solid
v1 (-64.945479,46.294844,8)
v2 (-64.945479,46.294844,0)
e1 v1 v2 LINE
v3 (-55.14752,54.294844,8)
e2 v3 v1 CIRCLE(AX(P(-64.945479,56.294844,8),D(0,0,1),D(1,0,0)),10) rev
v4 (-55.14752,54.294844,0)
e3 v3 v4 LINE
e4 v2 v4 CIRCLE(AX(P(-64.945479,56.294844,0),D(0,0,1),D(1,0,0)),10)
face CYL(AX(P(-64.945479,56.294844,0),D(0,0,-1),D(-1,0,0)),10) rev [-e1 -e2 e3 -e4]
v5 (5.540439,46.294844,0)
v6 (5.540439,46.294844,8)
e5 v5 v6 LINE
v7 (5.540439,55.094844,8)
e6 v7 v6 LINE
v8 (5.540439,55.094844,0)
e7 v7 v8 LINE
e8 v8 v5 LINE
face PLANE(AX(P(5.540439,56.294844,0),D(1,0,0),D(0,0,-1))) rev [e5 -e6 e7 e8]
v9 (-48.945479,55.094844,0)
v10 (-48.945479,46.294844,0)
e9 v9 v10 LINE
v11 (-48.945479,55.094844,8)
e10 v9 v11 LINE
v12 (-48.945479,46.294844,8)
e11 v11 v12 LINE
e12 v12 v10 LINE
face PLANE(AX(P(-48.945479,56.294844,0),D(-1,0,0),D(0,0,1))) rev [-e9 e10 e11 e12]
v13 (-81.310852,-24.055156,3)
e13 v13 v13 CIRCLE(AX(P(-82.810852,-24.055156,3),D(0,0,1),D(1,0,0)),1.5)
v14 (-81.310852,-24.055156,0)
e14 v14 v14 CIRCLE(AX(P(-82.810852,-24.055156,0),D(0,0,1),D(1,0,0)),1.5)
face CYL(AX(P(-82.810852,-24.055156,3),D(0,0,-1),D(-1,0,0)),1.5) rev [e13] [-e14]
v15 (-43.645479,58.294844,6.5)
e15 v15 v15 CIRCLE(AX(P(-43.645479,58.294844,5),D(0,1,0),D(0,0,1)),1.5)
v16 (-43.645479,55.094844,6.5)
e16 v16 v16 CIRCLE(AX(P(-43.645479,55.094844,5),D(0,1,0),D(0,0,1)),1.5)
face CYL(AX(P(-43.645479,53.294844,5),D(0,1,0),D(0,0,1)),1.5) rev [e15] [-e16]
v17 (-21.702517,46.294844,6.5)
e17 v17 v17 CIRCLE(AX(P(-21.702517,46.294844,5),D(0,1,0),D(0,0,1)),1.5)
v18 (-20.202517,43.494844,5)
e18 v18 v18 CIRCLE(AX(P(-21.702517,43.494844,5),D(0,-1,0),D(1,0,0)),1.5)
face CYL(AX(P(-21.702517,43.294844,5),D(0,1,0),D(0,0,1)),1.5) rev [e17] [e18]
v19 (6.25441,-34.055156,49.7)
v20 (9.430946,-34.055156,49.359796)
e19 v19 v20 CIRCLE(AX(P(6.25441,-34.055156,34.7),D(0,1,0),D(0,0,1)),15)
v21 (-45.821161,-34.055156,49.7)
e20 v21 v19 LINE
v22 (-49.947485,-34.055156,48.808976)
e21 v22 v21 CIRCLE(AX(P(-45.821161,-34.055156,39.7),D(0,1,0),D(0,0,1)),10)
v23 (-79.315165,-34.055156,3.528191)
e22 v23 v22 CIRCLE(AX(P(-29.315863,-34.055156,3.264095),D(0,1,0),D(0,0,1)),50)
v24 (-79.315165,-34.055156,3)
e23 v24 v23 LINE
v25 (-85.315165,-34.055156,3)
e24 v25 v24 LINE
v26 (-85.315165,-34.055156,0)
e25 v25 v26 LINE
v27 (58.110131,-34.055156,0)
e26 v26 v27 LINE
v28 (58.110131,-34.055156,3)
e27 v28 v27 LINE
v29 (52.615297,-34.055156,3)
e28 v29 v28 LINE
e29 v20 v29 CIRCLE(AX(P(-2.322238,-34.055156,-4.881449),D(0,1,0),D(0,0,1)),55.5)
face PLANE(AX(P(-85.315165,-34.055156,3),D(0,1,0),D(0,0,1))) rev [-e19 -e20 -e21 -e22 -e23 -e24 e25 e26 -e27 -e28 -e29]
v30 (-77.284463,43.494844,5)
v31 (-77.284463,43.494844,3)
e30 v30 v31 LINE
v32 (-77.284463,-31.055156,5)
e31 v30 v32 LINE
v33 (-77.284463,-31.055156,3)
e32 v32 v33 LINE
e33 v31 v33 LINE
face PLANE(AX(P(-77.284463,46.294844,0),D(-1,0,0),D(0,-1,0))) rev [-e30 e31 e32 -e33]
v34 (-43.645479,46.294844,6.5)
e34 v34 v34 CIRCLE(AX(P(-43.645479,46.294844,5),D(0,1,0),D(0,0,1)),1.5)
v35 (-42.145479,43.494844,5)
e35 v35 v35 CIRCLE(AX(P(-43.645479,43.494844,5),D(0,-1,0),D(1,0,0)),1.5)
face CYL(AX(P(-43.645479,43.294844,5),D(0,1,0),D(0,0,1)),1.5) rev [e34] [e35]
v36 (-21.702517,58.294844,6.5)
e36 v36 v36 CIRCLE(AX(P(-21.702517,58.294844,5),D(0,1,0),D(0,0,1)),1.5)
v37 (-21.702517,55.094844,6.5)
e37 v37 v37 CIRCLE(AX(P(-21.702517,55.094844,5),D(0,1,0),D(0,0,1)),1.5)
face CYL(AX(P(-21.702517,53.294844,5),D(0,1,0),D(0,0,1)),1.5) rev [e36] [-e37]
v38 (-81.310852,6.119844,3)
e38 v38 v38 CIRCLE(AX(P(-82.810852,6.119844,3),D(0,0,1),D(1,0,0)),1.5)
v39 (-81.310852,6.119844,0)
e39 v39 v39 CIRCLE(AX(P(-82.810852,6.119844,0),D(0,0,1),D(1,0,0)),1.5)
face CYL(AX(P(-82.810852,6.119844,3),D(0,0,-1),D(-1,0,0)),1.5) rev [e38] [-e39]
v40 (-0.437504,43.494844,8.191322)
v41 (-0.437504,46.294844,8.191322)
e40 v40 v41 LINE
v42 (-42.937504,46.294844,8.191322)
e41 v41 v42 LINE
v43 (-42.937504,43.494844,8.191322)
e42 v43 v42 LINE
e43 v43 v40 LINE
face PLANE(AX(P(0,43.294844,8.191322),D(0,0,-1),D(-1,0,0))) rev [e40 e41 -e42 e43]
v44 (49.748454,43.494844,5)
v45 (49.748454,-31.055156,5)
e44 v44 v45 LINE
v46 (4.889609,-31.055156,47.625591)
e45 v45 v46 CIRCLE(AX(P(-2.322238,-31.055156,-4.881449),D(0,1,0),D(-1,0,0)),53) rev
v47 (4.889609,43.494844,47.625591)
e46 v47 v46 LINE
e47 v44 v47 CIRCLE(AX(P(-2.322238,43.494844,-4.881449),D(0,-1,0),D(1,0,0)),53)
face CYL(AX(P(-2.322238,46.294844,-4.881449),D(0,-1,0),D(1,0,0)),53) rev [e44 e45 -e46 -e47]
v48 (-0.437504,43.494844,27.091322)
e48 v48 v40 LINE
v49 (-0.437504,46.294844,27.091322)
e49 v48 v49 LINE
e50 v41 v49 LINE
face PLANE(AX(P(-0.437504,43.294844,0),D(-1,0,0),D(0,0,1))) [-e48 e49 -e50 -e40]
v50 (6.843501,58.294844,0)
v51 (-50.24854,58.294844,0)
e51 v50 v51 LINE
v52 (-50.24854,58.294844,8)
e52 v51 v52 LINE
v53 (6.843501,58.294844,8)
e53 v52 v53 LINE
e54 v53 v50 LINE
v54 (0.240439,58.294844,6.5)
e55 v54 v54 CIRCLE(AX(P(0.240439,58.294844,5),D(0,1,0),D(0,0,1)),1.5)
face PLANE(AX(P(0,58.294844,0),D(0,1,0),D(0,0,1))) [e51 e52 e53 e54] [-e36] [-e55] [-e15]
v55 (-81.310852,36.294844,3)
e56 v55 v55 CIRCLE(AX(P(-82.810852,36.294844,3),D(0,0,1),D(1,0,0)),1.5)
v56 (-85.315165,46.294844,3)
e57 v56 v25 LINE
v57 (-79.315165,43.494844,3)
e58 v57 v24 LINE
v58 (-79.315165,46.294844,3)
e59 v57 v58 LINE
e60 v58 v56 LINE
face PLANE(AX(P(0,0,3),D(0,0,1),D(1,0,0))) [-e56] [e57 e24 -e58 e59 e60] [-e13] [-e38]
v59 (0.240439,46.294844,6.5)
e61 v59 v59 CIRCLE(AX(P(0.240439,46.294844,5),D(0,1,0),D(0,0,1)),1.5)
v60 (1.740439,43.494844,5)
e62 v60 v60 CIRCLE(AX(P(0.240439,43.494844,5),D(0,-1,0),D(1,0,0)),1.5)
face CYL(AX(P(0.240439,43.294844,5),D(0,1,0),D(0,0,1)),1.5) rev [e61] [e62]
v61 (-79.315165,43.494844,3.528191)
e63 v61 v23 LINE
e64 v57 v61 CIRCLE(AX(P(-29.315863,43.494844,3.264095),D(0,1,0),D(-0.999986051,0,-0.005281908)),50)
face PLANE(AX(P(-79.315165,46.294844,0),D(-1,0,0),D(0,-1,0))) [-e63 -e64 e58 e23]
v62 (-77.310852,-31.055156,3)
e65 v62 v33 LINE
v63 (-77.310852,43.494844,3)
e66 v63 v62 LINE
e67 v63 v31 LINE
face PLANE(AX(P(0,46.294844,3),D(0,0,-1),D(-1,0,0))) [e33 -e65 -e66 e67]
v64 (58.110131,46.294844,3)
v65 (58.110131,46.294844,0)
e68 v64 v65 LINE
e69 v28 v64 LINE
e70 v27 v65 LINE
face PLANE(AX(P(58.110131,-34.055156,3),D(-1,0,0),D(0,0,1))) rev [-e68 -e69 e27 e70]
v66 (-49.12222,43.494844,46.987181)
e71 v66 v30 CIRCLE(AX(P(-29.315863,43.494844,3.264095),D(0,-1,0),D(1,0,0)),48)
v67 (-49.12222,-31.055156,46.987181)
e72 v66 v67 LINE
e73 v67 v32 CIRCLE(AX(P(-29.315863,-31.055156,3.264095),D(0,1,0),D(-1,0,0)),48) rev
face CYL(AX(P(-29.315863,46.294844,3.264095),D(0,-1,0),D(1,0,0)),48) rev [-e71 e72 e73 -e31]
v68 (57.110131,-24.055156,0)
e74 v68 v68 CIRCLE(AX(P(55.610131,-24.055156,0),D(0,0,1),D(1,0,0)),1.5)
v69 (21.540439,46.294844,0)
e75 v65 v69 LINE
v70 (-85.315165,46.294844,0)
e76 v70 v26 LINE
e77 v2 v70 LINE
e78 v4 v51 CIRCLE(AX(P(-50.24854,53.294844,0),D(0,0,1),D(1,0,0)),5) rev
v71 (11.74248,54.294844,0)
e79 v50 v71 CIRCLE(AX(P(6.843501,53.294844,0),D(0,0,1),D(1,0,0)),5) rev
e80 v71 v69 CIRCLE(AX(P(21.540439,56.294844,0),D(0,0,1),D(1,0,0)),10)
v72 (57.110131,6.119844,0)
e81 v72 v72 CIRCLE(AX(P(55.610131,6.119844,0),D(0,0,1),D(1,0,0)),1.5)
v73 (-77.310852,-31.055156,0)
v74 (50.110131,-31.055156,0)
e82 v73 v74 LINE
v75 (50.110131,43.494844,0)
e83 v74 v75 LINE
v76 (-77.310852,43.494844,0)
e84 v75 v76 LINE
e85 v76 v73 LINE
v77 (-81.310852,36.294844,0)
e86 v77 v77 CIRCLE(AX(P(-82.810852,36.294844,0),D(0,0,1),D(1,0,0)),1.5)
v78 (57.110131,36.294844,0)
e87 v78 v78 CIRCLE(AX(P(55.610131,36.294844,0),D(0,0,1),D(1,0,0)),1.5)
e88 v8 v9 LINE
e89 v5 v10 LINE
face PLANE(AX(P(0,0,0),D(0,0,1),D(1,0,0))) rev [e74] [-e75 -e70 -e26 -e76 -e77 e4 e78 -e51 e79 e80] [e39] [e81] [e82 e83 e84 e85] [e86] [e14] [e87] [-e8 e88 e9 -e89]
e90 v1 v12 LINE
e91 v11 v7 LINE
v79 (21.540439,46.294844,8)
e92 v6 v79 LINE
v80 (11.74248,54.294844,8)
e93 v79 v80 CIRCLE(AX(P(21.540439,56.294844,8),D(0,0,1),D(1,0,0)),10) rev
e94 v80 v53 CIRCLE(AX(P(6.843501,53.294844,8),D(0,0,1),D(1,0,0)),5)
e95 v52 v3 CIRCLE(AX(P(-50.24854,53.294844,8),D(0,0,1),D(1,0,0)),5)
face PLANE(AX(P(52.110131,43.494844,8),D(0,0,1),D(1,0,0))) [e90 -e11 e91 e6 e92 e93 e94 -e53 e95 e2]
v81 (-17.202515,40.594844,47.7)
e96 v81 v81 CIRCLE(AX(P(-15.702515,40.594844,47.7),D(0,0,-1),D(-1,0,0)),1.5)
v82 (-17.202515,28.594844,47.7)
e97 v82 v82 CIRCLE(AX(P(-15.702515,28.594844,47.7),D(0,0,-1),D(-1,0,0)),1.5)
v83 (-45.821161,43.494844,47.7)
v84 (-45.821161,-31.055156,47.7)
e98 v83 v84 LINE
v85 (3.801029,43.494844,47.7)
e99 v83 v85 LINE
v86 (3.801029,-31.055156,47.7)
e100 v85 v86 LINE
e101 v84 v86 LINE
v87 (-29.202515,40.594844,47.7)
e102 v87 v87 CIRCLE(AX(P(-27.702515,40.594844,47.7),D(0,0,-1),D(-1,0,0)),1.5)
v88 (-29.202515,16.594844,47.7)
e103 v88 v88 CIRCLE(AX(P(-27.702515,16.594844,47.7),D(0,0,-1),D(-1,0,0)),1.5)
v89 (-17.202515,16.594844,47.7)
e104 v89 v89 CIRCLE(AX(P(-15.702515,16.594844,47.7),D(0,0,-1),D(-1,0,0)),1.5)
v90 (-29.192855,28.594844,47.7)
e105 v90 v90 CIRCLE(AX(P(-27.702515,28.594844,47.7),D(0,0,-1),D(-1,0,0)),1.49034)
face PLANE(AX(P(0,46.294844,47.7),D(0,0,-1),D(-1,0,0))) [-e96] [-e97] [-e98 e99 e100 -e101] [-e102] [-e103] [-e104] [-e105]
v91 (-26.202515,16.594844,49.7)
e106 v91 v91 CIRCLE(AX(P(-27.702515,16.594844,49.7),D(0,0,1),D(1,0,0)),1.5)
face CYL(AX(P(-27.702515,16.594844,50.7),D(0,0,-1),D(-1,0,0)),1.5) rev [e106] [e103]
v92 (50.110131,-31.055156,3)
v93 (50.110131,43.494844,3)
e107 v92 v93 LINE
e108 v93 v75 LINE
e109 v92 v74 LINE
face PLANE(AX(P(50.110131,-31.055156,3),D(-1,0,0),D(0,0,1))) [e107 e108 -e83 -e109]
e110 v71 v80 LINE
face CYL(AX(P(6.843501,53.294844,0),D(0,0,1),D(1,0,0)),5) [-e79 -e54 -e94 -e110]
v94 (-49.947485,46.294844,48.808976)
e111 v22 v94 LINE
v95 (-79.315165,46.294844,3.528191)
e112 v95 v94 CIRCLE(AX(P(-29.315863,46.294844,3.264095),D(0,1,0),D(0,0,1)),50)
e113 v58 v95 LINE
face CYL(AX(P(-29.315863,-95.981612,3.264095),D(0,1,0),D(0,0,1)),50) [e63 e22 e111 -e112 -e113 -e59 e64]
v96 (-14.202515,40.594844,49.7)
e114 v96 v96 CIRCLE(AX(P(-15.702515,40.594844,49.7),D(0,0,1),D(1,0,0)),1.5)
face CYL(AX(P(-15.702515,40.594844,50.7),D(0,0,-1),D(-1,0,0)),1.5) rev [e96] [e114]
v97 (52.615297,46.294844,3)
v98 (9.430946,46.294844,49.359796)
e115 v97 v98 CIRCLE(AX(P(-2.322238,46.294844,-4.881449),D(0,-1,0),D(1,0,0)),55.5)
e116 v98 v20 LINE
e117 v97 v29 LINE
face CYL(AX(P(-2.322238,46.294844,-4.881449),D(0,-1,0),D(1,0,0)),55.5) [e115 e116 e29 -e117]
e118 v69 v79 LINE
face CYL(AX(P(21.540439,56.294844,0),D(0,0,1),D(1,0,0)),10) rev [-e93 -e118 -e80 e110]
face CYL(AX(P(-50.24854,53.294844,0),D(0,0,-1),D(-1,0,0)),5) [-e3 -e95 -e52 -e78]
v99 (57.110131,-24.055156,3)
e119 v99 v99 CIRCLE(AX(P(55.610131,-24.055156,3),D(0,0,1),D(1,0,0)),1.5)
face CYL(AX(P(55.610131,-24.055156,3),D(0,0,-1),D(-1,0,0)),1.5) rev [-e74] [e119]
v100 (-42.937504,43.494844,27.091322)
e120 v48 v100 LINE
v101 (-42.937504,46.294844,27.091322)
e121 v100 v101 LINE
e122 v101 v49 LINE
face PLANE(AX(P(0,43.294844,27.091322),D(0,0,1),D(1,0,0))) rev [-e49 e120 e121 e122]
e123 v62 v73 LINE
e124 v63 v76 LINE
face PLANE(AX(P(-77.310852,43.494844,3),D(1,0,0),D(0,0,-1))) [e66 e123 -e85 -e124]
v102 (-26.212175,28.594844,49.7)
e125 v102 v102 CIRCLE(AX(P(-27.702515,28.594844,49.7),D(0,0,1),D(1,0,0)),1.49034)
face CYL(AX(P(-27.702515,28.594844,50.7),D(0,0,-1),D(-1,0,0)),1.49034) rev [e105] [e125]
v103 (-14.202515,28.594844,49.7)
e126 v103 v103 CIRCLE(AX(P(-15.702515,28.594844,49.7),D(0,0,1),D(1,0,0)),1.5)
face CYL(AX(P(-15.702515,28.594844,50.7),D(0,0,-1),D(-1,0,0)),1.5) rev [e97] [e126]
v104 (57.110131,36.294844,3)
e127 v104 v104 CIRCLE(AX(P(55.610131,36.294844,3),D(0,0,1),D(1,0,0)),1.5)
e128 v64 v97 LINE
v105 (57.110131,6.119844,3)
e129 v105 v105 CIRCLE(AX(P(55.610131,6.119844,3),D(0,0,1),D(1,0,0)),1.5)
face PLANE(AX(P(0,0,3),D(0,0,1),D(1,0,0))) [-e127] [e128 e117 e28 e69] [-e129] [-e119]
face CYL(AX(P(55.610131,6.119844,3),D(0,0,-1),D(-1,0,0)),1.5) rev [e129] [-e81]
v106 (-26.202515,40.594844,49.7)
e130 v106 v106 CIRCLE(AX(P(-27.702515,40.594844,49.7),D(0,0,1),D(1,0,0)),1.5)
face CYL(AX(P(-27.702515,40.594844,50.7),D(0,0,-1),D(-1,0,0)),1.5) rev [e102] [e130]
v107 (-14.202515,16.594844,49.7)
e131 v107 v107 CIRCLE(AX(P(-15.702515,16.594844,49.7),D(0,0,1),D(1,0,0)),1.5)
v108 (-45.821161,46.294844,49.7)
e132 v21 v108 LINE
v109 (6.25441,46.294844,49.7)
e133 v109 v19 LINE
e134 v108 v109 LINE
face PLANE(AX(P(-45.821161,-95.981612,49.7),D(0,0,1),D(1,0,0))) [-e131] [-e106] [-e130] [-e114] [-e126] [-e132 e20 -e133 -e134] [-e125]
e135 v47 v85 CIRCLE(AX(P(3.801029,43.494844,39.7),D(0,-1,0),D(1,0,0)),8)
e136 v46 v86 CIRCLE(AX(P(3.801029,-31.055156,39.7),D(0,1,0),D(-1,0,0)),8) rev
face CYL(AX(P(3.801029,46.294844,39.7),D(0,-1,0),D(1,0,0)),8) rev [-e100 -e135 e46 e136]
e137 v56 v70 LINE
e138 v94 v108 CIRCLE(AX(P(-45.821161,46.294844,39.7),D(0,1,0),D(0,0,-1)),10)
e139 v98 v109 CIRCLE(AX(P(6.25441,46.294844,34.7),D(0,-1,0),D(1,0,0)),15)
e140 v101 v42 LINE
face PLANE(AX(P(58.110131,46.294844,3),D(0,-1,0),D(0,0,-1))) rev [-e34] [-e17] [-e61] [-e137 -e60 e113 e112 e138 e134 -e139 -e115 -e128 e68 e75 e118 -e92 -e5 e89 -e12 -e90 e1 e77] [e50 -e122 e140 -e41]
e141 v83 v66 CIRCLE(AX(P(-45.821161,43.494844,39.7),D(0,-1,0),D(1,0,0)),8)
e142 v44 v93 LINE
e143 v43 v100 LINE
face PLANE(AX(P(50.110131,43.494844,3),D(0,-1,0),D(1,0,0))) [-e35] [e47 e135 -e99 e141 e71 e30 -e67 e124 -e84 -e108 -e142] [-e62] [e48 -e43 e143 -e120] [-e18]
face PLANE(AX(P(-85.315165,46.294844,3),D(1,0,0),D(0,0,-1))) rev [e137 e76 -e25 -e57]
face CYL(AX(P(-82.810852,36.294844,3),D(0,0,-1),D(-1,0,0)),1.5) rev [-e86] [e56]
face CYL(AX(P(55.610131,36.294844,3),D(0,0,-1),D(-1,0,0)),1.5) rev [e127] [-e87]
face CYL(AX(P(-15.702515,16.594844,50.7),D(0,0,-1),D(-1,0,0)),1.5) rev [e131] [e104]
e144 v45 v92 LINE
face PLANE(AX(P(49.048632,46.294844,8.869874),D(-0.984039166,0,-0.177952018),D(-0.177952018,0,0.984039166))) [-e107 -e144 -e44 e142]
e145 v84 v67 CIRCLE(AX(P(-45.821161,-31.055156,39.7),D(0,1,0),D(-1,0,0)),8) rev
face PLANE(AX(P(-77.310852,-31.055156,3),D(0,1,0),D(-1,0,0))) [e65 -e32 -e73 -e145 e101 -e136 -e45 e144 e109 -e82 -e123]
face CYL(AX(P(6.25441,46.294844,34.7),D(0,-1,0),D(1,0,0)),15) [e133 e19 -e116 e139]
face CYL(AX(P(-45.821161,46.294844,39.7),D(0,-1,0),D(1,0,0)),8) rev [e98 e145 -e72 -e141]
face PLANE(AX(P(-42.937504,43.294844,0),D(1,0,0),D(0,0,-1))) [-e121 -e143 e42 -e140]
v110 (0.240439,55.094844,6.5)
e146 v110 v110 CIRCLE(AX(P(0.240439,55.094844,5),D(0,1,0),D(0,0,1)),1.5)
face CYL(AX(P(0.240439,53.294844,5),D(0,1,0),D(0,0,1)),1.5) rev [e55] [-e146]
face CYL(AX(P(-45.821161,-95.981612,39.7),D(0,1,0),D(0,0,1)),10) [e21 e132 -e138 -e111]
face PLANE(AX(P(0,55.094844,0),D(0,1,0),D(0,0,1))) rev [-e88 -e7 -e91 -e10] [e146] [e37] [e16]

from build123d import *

# Parameters (mm, degrees)
SKETCH_1_W                  = 143.42529591
SKETCH_1_H                  = 80.35
SKETCH_1_R                  = 1.5
SKETCH_1_W_2                = 127.420983087
SKETCH_1_H_2                = 74.55
EXTRUDE_1_DEPTH             = 3
SKETCH_2_W                  = 131.42529591
SKETCH_2_H                  = 5
SKETCH_2_R                  = 1.5
EXTRUDE_2_DEPTH             = 2.8
SKETCH_3_R                  = 1.5
CUT_EXTRUDE_1_DEPTH         = 10
SKETCH_4_W                  = 6
SKETCH_4_H                  = 8
EXTRUDE_3_DEPTH             = 10
SKETCH_5_W                  = 54.485918212
SKETCH_5_H                  = 8
EXTRUDE_4_DEPTH             = 1.2
FILLET_1_R                  = 10
SKETCH_6_R                  = 1.5
CUT_EXTRUDE_2_DEPTH         = 3
EXTRUDE_5_DEPTH             = 2.8
SKETCH_8_W                  = 42.5
SKETCH_8_H                  = 8
SKETCH_8_H_2                = 10.9
SKETCH_8_R                  = 1.5
CUT_EXTRUDE_3_DEPTH         = 3
EXTRUDE_6_REACH             = 127.55
EXTRUDE_6_DIRECTION_2_DEPTH = 2.8
SKETCH_11_R                 = 1.5
SKETCH_11_R_2               = 1.490339558
CUT_EXTRUDE_4_DEPTH         = 3
EXTRUDE_START               = -3
EXTRUDE_7_DEPTH             = 3
EXTRUDE_START_2             = 2
SKETCH_13_W                 = 66.485918212
SKETCH_13_H                 = 8
SKETCH_13_R                 = 1.5
EXTRUDE_8_DEPTH             = 2
FILLET_2_R                  = 5


with BuildPart() as part:
    # 草图1 → 凸台-拉伸1 (new body)
    with BuildSketch(Plane.XY):
        with Locations((-13.602517363, 6.11984421)):
            Rectangle(SKETCH_1_W, SKETCH_1_H)
        with Locations((55.610130592, -24.05515579)):
            Circle(SKETCH_1_R, mode=Mode.SUBTRACT)
        with Locations((55.610130592, 6.11984421)):
            Circle(SKETCH_1_R, mode=Mode.SUBTRACT)
        with Locations((55.610130592, 36.29484421)):
            Circle(SKETCH_1_R, mode=Mode.SUBTRACT)
        with Locations((-82.810852495, -24.05515579)):
            Circle(SKETCH_1_R, mode=Mode.SUBTRACT)
        with Locations((-82.810852495, 6.11984421)):
            Circle(SKETCH_1_R, mode=Mode.SUBTRACT)
        with Locations((-82.810852495, 36.29484421)):
            Circle(SKETCH_1_R, mode=Mode.SUBTRACT)
        with Locations((-13.600360952, 6.21984421)):
            Rectangle(SKETCH_1_W_2, SKETCH_1_H_2, mode=Mode.SUBTRACT)
    extrude(amount=EXTRUDE_1_DEPTH)

    # 草图2 → 凸台-拉伸2 (add)
    with BuildSketch(Plane(origin=(0, 46.29484421, 0), x_dir=(1, 0, 0), z_dir=(0, 1, 0))):
        with Locations((-13.602517363, -5.5)):
            Rectangle(SKETCH_2_W, SKETCH_2_H)
        with Locations(Location((-21.702517363, -5, 0), (0, 0, 180))):
            Circle(SKETCH_2_R, mode=Mode.SUBTRACT)
    extrude(amount=-EXTRUDE_2_DEPTH)

    # 草图3 → 切除-拉伸1 (cut)
    with BuildSketch(Plane(origin=(0, 46.29484421, 0), x_dir=(1, 0, 0), z_dir=(0, 1, 0))):
        with Locations(Location((0.240439338, -5, 0), (0, 0, 270))):
            Circle(SKETCH_3_R)
        with Locations(Location((-43.645478874, -5, 0), (0, 0, 270))):
            Circle(SKETCH_3_R)
    extrude(amount=-CUT_EXTRUDE_1_DEPTH, mode=Mode.SUBTRACT)

    # 草图4 → 凸台-拉伸3 (add)
    with BuildSketch(Plane(origin=(0, 46.29484421, 0), x_dir=(1, 0, 0), z_dir=(0, 1, 0))):
        with Locations((8.540439338, -4)):
            Rectangle(SKETCH_4_W, SKETCH_4_H)
        with Locations((-51.945478874, -4)):
            Rectangle(SKETCH_4_W, SKETCH_4_H)
    extrude(amount=EXTRUDE_3_DEPTH)

    # 草图5 → 凸台-拉伸4 (add)
    with BuildSketch(Plane(origin=(0, 56.29484421, 0), x_dir=(1, 0, 0), z_dir=(0, 1, 0))):
        with Locations((-21.702519768, -4)):
            Rectangle(SKETCH_5_W, SKETCH_5_H)
    extrude(amount=-EXTRUDE_4_DEPTH)

    # 圆角1
    fillet_1_edges = [part.edges().sort_by_distance(p)[0] for p in [
        (11.540439338, 46.29484421, 4),
        (-54.945478874, 46.29484421, 4),
    ]]
    fillet(fillet_1_edges, radius=FILLET_1_R - 0.0001)  # a hair under: the kernel refuses the full size

    # 草图6 → 切除-拉伸2 (cut)
    with BuildSketch(Plane(origin=(0, 56.29484421, 0), x_dir=(1, 0, 0), z_dir=(0, 1, 0))):
        with Locations(Location((0.240439338, -5, 0), (0, 0, 270))):
            Circle(SKETCH_6_R)
        with Locations(Location((-21.702517363, -5, 0), (0, 0, 180))):
            Circle(SKETCH_6_R)
        with Locations(Location((-43.645478874, -5, 0), (0, 0, 270))):
            Circle(SKETCH_6_R)
    extrude(amount=-CUT_EXTRUDE_2_DEPTH, mode=Mode.SUBTRACT)

    # 草图7 → 凸台-拉伸5 (add)
    with BuildSketch(Plane(origin=(0, 46.29484421, 0), x_dir=(1, 0, 0), z_dir=(0, 1, 0))):
        with BuildLine():
            Line((52.110130592, -3), (-79.315165318, -3))
            ThreePointArc((-79.315165318, -3), (-71.408587337, -30.249323597), (-49.947485102, -48.808976146))
            ThreePointArc((-49.947485102, -48.808976146), (-47.931875984, -49.474706171), (-45.821160639, -49.7))
            Line((-45.821160639, -49.7), (3.801028521, -49.7))
            ThreePointArc((3.801028521, -49.7), (4.482979053, -49.676720076), (5.161754433, -49.606988694))
            ThreePointArc((5.161754433, -49.606988694), (36.42646247, -34.151078405), (52.110130592, -3))
        make_face()
    extrude(amount=-EXTRUDE_5_DEPTH)

    # 草图8 → 切除-拉伸3 (cut)
    with BuildSketch(Plane(origin=(0, 46.29484421, 0), x_dir=(1, 0, 0), z_dir=(0, 1, 0))):
        with BuildLine():
            Line((52.110130592, -8), (52.110130592, -3))
            ThreePointArc((52.110130592, -3), (51.686965751, -5.511139637), (51.148017839, -8))
            Line((51.148017839, -8), (52.110130592, -8))
        make_face()
        with BuildLine():
            ThreePointArc((-79.091069545, -8), (-79.253197971, -5.766605102), (-79.315165318, -3.528190833))
            Line((-79.315165318, -3.528190833), (-79.315165318, -8))
            Line((-79.315165318, -8), (-79.091069545, -8))
        make_face()
        with BuildLine():
            Line((-79.315165318, -3.528190833), (-79.315165318, -3))
            ThreePointArc((-79.315165318, -3), (-79.315862787, -3.264095416), (-79.315165318, -3.528190833))
        make_face()
        with Locations((-21.687503936, -23.091321672)):
            Rectangle(SKETCH_8_W, SKETCH_8_H)
        with Locations((-21.687503936, -13.641321672)):
            Rectangle(SKETCH_8_W, SKETCH_8_H_2)
        with Locations(Location((0.240439338, -5, 0), (0, 0, 270))):
            Circle(SKETCH_8_R)
        with Locations(Location((-43.645478874, -5, 0), (0, 0, 270))):
            Circle(SKETCH_8_R)
        with Locations(Location((-21.702517363, -5, 0), (0, 0, 270))):
            Circle(SKETCH_8_R)
    extrude(amount=-CUT_EXTRUDE_3_DEPTH, mode=Mode.SUBTRACT)

    # 凸台-拉伸6: up to this face of the body (flat: up to its plane)
    extrude_6_end = Plane(part.part.faces().sort_by_distance((-13.602517363, -34.05515579, 1.5))[0])
    # 草图9 → 凸台-拉伸6 (add, up to the picked face)
    with BuildSketch(Plane.XZ.offset(-43.49484421), mode=Mode.PRIVATE) as extrude_6_sk1:
        with BuildLine():
            ThreePointArc((-45.821160639, 49.7), (-47.931875984, 49.474706171), (-49.947485102, 48.808976146))
            ThreePointArc((-49.947485102, 48.808976146), (-71.265466668, 30.471277082), (-79.315165318, 3.528190833))
            Line((-79.315165318, 3.528190833), (-79.315165318, 3))
            Line((-79.315165318, 3), (-77.284463301, 3))
            Line((-77.284463301, 3), (-77.284463301, 5))
            ThreePointArc((-77.284463301, 5), (-69.179280492, 30.001857642), (-49.122220209, 46.987180917))
            ThreePointArc((-49.122220209, 46.987180917), (-47.509732915, 47.519764937), (-45.821160639, 47.7))
            Line((-45.821160639, 47.7), (3.801028521, 47.7))
            ThreePointArc((3.801028521, 47.7), (4.346588947, 47.681376061), (4.889609251, 47.625590956))
            ThreePointArc((4.889609251, 47.625590956), (34.185844829, 33.539377025), (49.748453895, 5))
            Line((49.748453895, 5), (50.110130592, 3))
            Line((50.110130592, 3), (52.615296987, 3))
            ThreePointArc((52.615296987, 3), (38.28835989, 32.947499211), (9.430945753, 49.359795972))
            ThreePointArc((9.430945753, 49.359795972), (7.851760578, 49.614706494), (6.254409581, 49.7))
            Line((6.254409581, 49.7), (-45.821160639, 49.7))
        make_face()
    extrude_6_tool1 = split(extrude(extrude_6_sk1.sketch, amount=EXTRUDE_6_REACH, mode=Mode.PRIVATE), bisect_by=extrude_6_end, keep=Keep.BOTH, mode=Mode.PRIVATE)
    add(extrude_6_tool1.solids().sort_by(Axis((-47.636477, 43.494844, 48.106717), (0, -1, 0)))[0])

    # 草图9 → 凸台-拉伸6 direction 2 (add)
    with BuildSketch(Plane.XZ.offset(-43.49484421)):
        with BuildLine():
            ThreePointArc((-45.821160639, 49.7), (-47.931875984, 49.474706171), (-49.947485102, 48.808976146))
            ThreePointArc((-49.947485102, 48.808976146), (-71.265466668, 30.471277082), (-79.315165318, 3.528190833))
            Line((-79.315165318, 3.528190833), (-79.315165318, 3))
            Line((-79.315165318, 3), (-77.284463301, 3))
            Line((-77.284463301, 3), (-77.284463301, 5))
            ThreePointArc((-77.284463301, 5), (-69.179280492, 30.001857642), (-49.122220209, 46.987180917))
            ThreePointArc((-49.122220209, 46.987180917), (-47.509732915, 47.519764937), (-45.821160639, 47.7))
            Line((-45.821160639, 47.7), (3.801028521, 47.7))
            ThreePointArc((3.801028521, 47.7), (4.346588947, 47.681376061), (4.889609251, 47.625590956))
            ThreePointArc((4.889609251, 47.625590956), (34.185844829, 33.539377025), (49.748453895, 5))
            Line((49.748453895, 5), (50.110130592, 3))
            Line((50.110130592, 3), (52.615296987, 3))
            ThreePointArc((52.615296987, 3), (38.28835989, 32.947499211), (9.430945753, 49.359795972))
            ThreePointArc((9.430945753, 49.359795972), (7.851760578, 49.614706494), (6.254409581, 49.7))
            Line((6.254409581, 49.7), (-45.821160639, 49.7))
        make_face()
    extrude(amount=-EXTRUDE_6_DIRECTION_2_DEPTH)

    # 草图11 → 切除-拉伸4 (cut)
    with BuildSketch(Plane(origin=(0, 0, 47.7), x_dir=(-1, 0, 0), z_dir=(0, 0, -1))):
        with Locations((15.702514958, 40.59484421)):
            Circle(SKETCH_11_R)
        with Locations((27.702514958, 40.59484421)):
            Circle(SKETCH_11_R)
        with Locations((15.702514958, 28.59484421)):
            Circle(SKETCH_11_R)
        with Locations((27.702514958, 28.59484421)):
            Circle(SKETCH_11_R_2)
        with Locations((27.702514958, 16.59484421)):
            Circle(SKETCH_11_R)
        with Locations((15.702514958, 16.59484421)):
            Circle(SKETCH_11_R)
    extrude(amount=-CUT_EXTRUDE_4_DEPTH, mode=Mode.SUBTRACT)

    # 草图12 → 凸台-拉伸7 (add)
    with BuildSketch(Plane.XZ.offset(34.05515579).offset(EXTRUDE_START)):
        with BuildLine():
            Line((50.110130592, 3), (-77.284463301, 3))
            Line((-77.284463301, 3), (-77.284463301, 5))
            ThreePointArc((-77.284463301, 5), (-69.179280492, 30.001857642), (-49.122220209, 46.987180917))
            ThreePointArc((-49.122220209, 46.987180917), (-47.509732915, 47.519764937), (-45.821160639, 47.7))
            Line((-45.821160639, 47.7), (3.801028521, 47.7))
            ThreePointArc((3.801028521, 47.7), (4.346588947, 47.681376061), (4.889609251, 47.625590956))
            ThreePointArc((4.889609251, 47.625590956), (34.185844829, 33.539377025), (49.748453895, 5))
            Line((49.748453895, 5), (50.110130592, 3))
        make_face()
        with BuildLine():
            Line((50.110130592, 3), (52.110130592, 3))
            Line((52.110130592, 3), (52.615296987, 3))
            ThreePointArc((52.615296987, 3), (38.28835989, 32.947499211), (9.430945753, 49.359795972))
            ThreePointArc((9.430945753, 49.359795972), (7.851760578, 49.614706494), (6.254409581, 49.7))
            Line((6.254409581, 49.7), (3.801028521, 49.7))
            Line((3.801028521, 49.7), (-45.821160639, 49.7))
            ThreePointArc((-45.821160639, 49.7), (-47.931875984, 49.474706171), (-49.947485102, 48.808976146))
            ThreePointArc((-49.947485102, 48.808976146), (-71.265466668, 30.471277082), (-79.315165318, 3.528190833))
            Line((-79.315165318, 3.528190833), (-79.315165318, 3))
            Line((-79.315165318, 3), (-77.284463301, 3))
            Line((-77.284463301, 3), (-77.284463301, 5))
            ThreePointArc((-77.284463301, 5), (-69.179280492, 30.001857642), (-49.122220209, 46.987180917))
            ThreePointArc((-49.122220209, 46.987180917), (-47.509732915, 47.519764937), (-45.821160639, 47.7))
            Line((-45.821160639, 47.7), (3.801028521, 47.7))
            ThreePointArc((3.801028521, 47.7), (4.346588947, 47.681376061), (4.889609251, 47.625590956))
            ThreePointArc((4.889609251, 47.625590956), (34.185844829, 33.539377025), (49.748453895, 5))
            Line((49.748453895, 5), (50.110130592, 3))
        make_face()
    extrude(amount=EXTRUDE_7_DEPTH)

    # 草图13 → 凸台-拉伸8 (add)
    with BuildSketch(Plane(origin=(0, 56.29484421, 0), x_dir=(1, 0, 0), z_dir=(0, 1, 0)).offset(EXTRUDE_START_2)):
        with Locations((-21.702519768, -4)):
            Rectangle(SKETCH_13_W, SKETCH_13_H)
        with Locations(Location((-43.645478874, -5, 0), (0, 0, 270))):
            Circle(SKETCH_13_R, mode=Mode.SUBTRACT)
        with Locations(Location((-21.702517363, -5, 0), (0, 0, 270))):
            Circle(SKETCH_13_R, mode=Mode.SUBTRACT)
        with Locations(Location((0.240439338, -5, 0), (0, 0, 270))):
            Circle(SKETCH_13_R, mode=Mode.SUBTRACT)
    extrude(amount=-EXTRUDE_8_DEPTH)

    # 圆角2
    fillet_2_edges = [part.edges().sort_by_distance(p)[0] for p in [
        (-54.945478874, 58.29484421, 4),
        (11.540439338, 58.29484421, 4),
    ]]
    fillet(fillet_2_edges, radius=FILLET_2_R)


solid = part.part
